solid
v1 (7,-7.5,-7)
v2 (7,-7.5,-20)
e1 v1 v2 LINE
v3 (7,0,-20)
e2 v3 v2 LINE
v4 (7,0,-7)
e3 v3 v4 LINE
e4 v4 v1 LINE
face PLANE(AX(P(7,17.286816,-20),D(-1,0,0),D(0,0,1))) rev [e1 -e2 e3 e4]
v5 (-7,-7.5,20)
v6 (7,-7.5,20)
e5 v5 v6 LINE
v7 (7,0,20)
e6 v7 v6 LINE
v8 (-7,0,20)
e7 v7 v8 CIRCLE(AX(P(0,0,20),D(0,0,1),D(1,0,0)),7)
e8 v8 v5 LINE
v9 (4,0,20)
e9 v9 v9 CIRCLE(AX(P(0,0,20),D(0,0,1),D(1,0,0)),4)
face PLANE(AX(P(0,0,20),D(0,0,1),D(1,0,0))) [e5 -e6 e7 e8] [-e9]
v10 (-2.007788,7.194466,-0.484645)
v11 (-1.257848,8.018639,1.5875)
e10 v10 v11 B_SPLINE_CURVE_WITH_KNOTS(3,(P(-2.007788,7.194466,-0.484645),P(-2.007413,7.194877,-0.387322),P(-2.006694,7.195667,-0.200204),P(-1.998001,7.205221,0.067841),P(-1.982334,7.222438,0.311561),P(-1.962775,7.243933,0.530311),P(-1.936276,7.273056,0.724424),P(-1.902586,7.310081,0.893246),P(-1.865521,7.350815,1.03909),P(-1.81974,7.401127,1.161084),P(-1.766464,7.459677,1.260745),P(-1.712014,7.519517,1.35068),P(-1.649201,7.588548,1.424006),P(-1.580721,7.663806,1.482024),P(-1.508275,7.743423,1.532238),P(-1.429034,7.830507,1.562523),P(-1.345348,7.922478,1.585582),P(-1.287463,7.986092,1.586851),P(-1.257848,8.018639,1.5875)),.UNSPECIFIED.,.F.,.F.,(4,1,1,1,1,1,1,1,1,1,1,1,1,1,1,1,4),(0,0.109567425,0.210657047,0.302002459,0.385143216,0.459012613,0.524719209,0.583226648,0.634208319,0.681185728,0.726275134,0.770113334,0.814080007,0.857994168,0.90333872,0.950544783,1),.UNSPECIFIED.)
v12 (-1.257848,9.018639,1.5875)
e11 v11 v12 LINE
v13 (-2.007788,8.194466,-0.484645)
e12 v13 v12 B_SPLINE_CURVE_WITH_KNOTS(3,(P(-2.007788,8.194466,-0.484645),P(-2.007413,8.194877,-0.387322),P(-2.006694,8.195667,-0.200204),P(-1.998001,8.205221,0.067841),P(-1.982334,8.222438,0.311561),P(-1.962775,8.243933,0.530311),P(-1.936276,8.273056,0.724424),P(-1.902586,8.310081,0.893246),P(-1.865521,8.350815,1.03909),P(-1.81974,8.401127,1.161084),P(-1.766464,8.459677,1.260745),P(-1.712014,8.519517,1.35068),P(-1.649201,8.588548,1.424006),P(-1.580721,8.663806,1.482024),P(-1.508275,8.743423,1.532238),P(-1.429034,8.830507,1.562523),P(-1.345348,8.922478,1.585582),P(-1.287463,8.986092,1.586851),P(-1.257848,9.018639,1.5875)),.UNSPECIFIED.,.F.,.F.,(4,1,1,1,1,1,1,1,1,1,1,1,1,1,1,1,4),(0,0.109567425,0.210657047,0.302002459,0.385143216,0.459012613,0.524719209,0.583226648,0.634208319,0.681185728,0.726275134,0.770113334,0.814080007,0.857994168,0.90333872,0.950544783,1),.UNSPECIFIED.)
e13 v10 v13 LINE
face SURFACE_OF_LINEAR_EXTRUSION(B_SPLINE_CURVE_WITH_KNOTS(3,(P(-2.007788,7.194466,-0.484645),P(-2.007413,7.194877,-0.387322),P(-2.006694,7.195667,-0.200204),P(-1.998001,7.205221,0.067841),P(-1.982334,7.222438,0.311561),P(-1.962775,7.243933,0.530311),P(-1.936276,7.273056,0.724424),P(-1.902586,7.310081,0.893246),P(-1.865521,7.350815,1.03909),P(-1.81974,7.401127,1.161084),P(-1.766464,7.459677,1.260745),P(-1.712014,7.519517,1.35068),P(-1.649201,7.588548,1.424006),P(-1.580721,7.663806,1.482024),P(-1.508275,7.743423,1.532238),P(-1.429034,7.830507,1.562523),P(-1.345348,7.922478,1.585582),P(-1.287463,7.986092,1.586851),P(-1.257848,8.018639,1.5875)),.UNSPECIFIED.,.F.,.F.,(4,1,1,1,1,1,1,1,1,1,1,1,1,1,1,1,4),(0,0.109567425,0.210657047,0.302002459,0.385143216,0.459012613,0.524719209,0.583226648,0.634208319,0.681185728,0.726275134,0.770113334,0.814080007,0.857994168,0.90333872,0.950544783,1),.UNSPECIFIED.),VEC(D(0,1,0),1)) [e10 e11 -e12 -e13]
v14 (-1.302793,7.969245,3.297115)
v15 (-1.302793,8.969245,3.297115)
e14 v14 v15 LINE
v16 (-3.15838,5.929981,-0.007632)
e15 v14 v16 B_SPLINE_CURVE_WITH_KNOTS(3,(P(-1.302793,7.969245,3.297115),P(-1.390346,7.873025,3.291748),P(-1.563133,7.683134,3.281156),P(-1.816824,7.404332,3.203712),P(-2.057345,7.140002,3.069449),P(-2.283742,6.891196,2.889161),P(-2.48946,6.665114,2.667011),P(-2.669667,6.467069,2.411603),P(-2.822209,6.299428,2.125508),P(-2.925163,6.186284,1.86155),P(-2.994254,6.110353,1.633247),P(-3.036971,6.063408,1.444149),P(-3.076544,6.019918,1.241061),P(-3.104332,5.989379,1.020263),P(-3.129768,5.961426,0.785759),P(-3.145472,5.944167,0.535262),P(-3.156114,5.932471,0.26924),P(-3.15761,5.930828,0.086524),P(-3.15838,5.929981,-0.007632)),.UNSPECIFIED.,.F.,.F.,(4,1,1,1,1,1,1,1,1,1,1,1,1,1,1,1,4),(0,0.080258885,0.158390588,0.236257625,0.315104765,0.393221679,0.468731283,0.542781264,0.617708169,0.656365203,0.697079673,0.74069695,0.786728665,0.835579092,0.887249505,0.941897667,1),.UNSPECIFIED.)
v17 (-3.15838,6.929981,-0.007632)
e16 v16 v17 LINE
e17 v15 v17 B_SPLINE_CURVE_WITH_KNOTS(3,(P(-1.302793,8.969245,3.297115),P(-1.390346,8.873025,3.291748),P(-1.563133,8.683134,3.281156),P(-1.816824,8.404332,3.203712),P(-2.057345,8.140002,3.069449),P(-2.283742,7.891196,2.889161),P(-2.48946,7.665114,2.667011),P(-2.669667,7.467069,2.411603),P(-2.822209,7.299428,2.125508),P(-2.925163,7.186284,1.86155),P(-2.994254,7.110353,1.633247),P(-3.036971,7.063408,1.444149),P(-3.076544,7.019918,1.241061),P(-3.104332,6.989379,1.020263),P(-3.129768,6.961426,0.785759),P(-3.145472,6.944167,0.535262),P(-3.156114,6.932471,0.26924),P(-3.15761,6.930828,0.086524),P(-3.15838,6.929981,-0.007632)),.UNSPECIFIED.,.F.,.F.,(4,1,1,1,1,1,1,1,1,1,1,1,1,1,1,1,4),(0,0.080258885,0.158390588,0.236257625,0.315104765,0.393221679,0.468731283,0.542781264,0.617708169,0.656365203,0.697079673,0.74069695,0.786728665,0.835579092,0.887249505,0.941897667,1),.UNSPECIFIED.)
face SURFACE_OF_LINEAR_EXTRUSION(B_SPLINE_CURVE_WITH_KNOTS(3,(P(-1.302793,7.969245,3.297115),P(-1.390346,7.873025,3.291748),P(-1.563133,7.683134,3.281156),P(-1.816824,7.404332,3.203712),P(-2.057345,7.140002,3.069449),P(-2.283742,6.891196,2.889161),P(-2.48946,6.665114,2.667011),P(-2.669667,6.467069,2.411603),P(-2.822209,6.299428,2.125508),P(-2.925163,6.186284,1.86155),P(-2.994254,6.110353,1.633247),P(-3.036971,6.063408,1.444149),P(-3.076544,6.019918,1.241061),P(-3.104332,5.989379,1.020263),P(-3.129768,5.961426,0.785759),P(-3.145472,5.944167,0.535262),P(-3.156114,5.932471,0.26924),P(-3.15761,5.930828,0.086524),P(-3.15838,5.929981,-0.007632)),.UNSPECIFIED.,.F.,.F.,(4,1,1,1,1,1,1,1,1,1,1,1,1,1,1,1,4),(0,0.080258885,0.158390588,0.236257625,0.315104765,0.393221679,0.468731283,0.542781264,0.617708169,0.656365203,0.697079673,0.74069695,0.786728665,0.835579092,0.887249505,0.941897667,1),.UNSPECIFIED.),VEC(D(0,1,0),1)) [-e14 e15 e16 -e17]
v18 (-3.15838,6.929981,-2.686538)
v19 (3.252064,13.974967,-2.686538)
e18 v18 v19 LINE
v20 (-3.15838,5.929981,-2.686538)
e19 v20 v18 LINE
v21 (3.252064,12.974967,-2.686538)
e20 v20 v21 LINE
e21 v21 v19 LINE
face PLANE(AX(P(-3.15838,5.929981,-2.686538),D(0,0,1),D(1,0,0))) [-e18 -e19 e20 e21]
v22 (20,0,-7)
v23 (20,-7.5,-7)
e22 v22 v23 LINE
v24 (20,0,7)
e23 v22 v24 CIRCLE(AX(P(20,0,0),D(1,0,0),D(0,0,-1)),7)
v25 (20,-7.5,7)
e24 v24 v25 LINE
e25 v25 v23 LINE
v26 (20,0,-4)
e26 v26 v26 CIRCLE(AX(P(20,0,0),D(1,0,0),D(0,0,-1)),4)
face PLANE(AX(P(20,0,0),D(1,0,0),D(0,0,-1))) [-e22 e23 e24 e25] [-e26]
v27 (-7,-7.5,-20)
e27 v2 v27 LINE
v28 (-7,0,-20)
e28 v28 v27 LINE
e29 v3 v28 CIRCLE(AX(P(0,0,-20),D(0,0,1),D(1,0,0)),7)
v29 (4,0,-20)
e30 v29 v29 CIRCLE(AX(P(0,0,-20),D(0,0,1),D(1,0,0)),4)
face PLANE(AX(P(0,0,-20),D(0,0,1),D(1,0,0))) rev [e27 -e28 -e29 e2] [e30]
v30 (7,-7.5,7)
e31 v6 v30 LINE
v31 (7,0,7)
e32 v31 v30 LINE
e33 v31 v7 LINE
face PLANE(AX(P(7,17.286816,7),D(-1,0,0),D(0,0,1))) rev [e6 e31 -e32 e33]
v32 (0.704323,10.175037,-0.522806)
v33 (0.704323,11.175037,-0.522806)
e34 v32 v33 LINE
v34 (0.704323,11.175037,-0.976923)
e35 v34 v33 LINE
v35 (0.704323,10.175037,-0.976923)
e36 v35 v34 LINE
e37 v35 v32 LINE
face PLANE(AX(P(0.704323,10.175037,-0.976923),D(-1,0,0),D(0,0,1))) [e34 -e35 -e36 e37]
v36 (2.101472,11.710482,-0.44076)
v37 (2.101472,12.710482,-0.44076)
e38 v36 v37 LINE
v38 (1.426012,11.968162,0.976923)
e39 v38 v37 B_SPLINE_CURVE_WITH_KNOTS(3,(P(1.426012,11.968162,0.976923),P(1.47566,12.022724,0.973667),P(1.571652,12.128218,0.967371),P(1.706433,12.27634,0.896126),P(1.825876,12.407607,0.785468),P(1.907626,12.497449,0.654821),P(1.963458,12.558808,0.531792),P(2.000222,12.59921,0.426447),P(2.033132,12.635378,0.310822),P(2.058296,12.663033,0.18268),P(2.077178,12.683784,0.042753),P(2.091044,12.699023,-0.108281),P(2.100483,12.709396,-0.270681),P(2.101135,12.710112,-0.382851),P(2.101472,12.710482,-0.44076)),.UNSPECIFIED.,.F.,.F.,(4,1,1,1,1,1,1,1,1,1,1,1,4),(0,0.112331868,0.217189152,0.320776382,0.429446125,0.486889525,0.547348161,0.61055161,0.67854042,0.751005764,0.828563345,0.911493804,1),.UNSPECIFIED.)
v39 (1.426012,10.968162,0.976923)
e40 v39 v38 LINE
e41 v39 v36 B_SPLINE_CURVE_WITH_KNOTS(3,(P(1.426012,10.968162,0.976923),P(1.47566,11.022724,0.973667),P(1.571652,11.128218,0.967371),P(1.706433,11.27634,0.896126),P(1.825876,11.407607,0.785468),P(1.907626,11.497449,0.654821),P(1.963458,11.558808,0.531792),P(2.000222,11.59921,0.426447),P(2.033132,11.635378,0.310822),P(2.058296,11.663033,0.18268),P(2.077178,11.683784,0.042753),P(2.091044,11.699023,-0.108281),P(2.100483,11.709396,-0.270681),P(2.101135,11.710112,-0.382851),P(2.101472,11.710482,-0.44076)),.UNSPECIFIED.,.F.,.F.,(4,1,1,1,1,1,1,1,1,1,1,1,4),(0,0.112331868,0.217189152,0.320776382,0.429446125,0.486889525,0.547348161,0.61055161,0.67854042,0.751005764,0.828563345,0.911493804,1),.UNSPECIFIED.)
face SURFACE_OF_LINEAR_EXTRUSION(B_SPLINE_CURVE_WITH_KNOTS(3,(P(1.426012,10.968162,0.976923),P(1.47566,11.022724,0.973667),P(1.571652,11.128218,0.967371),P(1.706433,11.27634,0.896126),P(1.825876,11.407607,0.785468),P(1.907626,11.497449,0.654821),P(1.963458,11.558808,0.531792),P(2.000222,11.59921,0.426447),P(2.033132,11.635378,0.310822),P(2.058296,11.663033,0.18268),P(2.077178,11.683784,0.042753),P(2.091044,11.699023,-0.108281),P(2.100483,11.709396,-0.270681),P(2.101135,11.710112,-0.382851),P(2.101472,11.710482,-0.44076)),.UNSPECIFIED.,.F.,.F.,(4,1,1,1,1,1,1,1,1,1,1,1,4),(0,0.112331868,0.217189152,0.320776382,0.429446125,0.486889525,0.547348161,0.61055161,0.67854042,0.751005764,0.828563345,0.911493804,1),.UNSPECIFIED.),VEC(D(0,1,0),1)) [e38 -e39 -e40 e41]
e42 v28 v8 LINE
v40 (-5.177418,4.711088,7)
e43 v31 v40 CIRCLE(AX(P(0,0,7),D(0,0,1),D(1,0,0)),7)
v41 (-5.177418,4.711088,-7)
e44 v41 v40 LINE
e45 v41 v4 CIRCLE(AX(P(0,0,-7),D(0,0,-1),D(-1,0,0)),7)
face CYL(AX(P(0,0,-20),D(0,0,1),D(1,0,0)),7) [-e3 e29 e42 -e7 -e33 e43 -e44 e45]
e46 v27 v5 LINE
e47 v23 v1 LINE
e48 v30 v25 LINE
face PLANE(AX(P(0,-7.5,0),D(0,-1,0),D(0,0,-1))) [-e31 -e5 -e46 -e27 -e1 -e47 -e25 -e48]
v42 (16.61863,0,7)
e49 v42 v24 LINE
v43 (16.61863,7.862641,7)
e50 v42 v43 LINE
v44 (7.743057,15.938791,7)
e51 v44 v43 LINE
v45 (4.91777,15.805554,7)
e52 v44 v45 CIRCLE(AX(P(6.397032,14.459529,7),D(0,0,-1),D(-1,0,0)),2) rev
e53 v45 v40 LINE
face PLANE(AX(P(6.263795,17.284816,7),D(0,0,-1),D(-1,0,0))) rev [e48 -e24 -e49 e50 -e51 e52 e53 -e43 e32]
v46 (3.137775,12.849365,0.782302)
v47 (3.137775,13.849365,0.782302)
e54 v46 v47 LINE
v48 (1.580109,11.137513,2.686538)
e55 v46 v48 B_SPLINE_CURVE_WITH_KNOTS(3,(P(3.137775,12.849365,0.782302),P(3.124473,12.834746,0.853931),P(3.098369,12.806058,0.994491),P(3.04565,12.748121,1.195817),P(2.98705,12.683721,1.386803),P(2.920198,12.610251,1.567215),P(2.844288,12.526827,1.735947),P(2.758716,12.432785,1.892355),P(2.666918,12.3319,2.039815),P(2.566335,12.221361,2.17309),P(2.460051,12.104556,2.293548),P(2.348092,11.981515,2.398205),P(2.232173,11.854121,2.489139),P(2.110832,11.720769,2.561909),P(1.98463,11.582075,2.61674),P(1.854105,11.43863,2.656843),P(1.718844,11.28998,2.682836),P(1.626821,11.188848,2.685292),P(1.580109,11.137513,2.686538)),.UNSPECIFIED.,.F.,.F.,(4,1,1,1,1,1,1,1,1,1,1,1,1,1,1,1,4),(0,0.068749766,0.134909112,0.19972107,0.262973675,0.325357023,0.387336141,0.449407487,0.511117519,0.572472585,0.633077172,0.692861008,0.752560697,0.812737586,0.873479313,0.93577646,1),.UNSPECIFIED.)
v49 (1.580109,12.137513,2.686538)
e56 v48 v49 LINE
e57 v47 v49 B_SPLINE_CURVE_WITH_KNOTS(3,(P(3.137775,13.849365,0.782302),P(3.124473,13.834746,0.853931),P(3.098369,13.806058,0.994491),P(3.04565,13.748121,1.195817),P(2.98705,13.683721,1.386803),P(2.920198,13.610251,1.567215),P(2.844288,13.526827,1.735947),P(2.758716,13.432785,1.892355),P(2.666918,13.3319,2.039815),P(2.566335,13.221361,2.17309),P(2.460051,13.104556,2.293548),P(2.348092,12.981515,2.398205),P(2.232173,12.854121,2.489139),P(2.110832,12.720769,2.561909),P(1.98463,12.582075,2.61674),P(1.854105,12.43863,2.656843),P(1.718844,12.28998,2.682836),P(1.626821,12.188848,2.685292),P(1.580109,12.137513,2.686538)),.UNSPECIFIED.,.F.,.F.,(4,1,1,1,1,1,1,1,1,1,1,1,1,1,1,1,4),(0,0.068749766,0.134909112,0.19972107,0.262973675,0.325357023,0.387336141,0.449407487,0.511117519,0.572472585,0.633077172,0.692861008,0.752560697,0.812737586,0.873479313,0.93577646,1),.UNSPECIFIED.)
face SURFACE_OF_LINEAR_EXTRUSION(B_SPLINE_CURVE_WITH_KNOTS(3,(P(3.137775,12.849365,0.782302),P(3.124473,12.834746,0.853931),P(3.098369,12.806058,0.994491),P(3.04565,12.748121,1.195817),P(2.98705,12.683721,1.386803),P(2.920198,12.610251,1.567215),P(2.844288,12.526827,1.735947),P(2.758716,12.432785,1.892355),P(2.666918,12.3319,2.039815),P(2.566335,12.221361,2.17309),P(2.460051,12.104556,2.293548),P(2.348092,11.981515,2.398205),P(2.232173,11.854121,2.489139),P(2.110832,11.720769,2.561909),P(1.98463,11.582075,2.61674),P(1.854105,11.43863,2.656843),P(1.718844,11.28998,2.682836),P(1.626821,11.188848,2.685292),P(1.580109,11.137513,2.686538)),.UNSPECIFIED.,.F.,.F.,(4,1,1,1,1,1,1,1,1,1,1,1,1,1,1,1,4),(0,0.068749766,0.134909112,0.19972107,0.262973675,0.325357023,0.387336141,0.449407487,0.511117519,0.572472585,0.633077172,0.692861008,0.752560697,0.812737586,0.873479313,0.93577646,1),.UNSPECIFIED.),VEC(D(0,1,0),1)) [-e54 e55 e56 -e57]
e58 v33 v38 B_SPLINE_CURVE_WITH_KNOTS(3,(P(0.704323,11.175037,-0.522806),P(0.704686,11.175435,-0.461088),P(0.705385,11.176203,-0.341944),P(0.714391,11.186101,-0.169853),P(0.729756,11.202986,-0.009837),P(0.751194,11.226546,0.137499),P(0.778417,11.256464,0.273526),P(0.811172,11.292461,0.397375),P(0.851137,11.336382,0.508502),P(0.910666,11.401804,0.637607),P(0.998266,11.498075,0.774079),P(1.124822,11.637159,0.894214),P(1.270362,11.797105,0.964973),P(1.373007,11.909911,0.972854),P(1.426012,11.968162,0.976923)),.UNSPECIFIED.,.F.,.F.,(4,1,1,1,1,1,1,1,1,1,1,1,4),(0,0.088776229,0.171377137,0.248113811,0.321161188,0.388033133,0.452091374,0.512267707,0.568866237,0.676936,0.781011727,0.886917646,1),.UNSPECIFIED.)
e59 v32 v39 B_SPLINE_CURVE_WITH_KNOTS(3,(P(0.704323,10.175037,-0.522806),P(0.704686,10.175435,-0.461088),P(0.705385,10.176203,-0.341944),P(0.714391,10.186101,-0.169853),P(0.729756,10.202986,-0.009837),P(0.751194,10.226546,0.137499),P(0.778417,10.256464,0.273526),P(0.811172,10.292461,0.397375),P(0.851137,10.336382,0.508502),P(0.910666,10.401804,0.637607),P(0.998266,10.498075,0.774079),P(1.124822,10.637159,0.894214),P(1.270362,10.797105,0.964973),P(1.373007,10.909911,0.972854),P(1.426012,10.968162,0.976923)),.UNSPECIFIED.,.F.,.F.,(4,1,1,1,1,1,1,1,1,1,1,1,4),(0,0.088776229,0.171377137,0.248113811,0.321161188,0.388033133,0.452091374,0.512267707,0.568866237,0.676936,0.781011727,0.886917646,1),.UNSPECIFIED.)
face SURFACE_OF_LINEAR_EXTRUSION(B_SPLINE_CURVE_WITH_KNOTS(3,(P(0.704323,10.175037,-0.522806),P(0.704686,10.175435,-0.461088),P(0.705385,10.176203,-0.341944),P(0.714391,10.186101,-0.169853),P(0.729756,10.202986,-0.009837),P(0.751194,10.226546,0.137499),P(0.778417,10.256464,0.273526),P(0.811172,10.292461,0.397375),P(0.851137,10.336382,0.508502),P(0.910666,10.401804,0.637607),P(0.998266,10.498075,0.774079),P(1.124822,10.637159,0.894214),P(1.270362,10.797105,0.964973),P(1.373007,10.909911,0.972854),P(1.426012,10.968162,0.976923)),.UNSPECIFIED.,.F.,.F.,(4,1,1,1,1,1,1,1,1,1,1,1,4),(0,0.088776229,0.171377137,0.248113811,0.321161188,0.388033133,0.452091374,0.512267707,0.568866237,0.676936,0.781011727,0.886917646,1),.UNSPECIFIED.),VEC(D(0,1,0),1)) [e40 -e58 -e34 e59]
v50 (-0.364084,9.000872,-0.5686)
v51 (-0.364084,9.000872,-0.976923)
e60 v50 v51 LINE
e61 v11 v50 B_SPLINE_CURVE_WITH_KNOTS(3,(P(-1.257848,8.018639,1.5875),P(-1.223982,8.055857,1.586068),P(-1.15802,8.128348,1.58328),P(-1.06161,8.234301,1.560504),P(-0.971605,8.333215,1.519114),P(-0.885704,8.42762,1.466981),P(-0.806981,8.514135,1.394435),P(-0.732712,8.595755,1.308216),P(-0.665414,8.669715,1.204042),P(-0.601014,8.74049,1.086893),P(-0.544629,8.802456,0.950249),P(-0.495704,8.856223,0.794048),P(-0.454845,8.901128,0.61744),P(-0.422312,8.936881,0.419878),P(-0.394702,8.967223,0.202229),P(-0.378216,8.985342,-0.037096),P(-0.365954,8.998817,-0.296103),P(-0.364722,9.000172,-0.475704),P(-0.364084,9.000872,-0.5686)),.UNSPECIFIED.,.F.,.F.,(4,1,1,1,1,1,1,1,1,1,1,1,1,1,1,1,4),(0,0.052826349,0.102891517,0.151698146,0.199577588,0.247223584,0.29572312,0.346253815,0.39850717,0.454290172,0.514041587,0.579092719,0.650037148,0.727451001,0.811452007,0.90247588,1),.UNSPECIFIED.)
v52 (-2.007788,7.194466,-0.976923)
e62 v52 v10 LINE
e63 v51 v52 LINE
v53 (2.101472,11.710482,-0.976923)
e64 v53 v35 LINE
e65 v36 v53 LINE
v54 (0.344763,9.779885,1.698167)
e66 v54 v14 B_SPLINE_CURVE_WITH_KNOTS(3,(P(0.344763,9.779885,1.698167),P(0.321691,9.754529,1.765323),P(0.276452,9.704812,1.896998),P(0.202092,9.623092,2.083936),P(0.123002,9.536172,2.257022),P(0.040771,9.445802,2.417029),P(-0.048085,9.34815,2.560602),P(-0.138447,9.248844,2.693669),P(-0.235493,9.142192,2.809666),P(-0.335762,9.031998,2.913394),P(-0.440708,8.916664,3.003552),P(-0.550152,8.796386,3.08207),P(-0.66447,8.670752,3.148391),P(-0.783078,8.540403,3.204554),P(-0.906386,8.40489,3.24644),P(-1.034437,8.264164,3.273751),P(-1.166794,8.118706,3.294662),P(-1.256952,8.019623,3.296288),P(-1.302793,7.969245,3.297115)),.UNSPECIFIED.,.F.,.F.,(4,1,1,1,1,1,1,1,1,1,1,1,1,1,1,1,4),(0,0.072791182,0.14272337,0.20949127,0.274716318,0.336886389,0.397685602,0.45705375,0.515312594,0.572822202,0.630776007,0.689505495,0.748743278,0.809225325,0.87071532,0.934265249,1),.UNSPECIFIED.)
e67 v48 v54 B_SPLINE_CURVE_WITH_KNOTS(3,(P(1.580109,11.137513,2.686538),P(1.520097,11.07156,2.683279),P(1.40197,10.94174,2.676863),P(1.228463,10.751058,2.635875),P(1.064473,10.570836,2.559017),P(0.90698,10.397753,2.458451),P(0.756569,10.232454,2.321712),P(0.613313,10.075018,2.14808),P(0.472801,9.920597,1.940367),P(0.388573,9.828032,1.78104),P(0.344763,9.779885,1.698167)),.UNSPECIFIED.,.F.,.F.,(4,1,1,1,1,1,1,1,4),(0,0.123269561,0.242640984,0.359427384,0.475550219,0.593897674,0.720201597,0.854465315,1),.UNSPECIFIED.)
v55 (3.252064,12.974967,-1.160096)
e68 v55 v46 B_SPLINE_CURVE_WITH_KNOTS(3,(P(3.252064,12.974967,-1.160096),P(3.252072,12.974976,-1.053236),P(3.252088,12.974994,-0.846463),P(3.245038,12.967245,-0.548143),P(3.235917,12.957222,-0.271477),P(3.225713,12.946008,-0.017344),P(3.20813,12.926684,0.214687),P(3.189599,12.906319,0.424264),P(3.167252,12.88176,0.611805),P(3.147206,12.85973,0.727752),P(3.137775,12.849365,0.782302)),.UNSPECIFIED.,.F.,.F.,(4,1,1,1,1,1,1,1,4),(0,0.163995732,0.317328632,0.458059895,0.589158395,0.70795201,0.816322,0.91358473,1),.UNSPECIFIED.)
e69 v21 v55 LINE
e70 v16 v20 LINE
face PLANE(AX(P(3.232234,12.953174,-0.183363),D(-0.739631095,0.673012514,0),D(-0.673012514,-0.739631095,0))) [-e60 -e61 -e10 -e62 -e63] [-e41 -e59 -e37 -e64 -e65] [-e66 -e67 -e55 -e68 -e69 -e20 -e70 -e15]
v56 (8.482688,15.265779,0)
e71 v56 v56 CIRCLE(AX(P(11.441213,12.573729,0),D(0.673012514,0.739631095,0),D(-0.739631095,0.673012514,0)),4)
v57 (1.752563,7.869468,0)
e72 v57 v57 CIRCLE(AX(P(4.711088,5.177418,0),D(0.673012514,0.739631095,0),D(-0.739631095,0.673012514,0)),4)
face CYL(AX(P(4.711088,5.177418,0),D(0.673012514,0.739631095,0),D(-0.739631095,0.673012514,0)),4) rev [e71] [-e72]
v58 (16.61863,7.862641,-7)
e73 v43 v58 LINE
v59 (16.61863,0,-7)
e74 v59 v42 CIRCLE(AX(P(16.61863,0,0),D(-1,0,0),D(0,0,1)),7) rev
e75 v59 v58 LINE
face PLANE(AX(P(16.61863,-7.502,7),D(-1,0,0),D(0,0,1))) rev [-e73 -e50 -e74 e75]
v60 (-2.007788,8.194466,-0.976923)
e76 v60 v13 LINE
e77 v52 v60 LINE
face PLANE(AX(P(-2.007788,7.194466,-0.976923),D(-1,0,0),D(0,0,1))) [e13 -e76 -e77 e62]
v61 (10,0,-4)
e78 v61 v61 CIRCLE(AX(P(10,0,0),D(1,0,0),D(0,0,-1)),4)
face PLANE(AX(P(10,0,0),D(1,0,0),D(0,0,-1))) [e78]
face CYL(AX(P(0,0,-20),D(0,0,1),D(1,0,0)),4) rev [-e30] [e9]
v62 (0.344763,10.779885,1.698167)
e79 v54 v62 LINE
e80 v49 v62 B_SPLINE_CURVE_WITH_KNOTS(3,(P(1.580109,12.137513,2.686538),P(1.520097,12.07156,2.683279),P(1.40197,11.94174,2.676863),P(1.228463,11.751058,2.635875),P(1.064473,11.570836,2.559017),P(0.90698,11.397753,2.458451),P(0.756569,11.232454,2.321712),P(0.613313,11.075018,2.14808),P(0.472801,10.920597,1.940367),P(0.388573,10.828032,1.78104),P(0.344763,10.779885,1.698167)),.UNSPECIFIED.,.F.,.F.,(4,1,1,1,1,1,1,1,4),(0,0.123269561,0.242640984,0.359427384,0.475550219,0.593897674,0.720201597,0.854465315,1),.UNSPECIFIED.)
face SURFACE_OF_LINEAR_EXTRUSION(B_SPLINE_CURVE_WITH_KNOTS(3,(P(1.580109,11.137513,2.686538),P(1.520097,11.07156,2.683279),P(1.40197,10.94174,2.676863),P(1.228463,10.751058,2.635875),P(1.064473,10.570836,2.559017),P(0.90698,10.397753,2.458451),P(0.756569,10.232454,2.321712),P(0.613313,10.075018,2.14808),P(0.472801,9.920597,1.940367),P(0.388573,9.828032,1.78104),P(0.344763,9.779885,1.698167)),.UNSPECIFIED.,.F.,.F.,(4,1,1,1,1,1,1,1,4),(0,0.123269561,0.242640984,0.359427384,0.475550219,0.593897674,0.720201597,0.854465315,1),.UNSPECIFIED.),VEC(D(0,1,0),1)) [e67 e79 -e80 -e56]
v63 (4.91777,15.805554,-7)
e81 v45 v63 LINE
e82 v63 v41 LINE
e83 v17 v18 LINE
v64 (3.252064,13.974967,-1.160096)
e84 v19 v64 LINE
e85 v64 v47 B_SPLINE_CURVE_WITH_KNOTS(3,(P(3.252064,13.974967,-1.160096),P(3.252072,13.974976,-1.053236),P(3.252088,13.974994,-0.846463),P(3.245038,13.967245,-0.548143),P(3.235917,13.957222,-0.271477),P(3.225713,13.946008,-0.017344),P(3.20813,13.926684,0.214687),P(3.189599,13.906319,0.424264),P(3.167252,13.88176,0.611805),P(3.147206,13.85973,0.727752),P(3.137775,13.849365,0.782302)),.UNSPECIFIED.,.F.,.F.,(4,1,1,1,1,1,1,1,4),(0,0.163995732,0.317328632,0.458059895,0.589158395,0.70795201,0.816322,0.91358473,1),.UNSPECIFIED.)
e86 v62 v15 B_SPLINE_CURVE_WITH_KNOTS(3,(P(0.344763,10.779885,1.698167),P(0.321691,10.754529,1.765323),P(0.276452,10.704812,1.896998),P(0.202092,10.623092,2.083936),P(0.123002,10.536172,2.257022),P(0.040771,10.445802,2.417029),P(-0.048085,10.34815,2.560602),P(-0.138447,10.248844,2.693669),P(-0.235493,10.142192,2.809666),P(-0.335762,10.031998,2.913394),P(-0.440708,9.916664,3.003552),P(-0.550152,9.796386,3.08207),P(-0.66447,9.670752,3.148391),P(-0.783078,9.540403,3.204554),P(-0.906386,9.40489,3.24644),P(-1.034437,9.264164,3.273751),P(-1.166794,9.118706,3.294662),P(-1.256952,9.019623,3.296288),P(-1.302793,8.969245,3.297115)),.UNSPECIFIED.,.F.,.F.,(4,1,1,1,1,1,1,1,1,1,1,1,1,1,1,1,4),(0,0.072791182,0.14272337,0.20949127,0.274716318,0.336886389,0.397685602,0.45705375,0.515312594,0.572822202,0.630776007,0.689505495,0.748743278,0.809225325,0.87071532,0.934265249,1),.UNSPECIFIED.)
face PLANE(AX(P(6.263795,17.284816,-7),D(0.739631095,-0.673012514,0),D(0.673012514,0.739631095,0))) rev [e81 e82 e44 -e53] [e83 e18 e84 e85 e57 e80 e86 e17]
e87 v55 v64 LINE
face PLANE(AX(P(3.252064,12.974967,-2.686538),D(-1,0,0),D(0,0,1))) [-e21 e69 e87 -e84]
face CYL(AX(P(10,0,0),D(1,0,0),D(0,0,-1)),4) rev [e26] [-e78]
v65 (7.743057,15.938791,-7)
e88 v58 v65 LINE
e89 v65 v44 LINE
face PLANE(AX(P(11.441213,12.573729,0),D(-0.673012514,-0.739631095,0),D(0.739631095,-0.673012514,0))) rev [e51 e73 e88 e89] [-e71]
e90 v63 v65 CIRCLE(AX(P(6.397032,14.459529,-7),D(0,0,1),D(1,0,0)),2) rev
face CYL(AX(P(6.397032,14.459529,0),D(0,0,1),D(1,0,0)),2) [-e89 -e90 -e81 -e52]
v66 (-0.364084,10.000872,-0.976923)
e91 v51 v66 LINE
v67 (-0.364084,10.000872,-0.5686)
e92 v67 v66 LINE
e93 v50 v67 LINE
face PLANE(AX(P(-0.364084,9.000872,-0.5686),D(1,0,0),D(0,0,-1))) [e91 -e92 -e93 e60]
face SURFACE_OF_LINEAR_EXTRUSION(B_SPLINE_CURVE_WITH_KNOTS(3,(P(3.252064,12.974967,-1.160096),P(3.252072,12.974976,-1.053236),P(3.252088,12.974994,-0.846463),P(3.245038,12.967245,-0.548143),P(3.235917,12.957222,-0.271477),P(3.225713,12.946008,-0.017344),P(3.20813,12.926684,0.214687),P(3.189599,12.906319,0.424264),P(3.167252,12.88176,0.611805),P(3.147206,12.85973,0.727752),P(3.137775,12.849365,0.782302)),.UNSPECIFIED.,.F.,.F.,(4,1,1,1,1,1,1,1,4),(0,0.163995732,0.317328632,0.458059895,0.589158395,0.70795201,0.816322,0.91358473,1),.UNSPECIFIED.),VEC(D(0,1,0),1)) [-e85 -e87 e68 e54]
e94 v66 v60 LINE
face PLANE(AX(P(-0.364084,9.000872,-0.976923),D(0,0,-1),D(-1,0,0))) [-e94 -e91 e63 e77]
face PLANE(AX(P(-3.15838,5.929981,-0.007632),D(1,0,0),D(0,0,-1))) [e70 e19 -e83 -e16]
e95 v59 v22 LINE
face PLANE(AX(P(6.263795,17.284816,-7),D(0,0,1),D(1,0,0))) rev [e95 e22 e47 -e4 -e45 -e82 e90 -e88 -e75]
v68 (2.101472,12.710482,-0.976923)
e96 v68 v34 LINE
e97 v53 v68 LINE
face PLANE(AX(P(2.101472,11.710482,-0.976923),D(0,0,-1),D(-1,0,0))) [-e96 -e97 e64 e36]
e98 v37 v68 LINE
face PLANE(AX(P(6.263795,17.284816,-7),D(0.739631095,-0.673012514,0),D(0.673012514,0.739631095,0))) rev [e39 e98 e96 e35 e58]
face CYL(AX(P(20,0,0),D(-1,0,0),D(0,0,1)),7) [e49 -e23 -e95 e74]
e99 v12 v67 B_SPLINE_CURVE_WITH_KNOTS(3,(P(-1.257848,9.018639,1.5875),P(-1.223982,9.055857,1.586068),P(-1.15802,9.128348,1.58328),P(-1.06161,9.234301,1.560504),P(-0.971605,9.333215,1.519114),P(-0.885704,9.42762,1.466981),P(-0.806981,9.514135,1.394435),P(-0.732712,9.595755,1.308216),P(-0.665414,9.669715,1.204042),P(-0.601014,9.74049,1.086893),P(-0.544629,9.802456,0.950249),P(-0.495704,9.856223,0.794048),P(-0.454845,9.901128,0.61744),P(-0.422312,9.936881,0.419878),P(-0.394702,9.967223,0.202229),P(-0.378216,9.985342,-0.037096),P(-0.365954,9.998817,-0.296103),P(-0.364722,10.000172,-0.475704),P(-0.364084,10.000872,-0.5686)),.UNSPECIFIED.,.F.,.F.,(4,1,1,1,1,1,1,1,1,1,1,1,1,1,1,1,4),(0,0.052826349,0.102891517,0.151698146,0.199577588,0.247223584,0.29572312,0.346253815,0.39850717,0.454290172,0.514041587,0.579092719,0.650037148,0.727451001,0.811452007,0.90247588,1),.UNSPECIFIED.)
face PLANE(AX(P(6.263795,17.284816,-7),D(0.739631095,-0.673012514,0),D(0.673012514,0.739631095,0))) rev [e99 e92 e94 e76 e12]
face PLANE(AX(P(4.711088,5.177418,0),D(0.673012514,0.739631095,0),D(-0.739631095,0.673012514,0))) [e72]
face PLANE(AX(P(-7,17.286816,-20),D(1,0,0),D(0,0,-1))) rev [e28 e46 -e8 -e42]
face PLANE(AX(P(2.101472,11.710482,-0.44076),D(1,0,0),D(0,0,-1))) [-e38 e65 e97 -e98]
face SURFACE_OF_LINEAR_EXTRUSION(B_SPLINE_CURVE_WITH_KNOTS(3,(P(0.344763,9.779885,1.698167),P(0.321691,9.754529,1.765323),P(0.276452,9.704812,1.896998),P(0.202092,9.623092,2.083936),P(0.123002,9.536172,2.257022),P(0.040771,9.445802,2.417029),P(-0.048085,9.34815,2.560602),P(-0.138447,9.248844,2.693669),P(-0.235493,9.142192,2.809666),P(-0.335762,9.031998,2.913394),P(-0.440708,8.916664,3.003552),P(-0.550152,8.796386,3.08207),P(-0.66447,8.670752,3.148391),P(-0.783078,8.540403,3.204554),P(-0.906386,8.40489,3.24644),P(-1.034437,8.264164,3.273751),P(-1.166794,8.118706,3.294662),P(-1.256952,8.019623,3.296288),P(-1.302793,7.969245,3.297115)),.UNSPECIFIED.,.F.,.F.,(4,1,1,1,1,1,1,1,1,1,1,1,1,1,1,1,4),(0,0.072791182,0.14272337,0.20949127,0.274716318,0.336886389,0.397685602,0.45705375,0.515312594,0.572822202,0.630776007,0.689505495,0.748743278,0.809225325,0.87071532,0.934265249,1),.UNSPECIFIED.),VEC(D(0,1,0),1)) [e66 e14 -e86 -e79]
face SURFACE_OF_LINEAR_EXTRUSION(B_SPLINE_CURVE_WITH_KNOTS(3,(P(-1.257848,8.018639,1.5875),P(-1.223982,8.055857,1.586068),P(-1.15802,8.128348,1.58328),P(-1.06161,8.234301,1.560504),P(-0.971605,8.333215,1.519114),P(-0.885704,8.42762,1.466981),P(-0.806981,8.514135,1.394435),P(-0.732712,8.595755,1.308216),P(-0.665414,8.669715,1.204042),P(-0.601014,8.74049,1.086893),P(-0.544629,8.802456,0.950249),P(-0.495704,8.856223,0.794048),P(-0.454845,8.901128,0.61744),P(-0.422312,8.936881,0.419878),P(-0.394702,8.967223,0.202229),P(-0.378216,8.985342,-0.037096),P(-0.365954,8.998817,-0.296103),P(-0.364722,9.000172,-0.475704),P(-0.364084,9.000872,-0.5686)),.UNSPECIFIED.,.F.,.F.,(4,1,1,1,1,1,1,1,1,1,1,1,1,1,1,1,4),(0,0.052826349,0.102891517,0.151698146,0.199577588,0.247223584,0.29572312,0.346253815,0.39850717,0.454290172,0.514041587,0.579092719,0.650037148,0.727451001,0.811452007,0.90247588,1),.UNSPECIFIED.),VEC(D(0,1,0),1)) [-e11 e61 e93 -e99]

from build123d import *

# Parameters (mm, degrees)
DODANIE_WYCI_GNI_CIE1_DEPTH             = 20
DODANIE_WYCI_GNI_CIE1_DEPTH_BACK        = 20
SZKIC1_R                                = 7
SZKIC1_R_2                              = 4
DODANIE_WYCI_GNI_CIE2_DEPTH             = 10
DODANIE_WYCI_GNI_CIE2_DEPTH_BACK        = 10
SZKIC2_R                                = 4
DODANIE_WYCI_GNI_CIE4_REACH             = 28.181
DODANIE_WYCI_GNI_CIE4_END_RADIUS        = 7
SZKIC3_W                                = 14
SZKIC3_H                                = 14
DODANIE_WYCI_GNI_CIE4_DIRECTION_2_DEPTH = 10
SZKIC9_R                                = 7
DODANIE_WYCI_GNI_CIE6_DEPTH             = 20
DODANIE_WYCI_GNI_CIE5_REACH             = 39.607
SZKIC12_R                               = 4
WYTNIJ_WYCI_GNI_CIE3_DEPTH              = 40.984557912
DODANIE_WYCI_GNI_CIE7_START             = 8
DODANIE_WYCI_GNI_CIE7_DEPTH             = 8.618630395
SZKIC4_R                                = 4
WYTNIJ_WYCI_GNI_CIE1_DEPTH              = 10
SZKIC10_R                               = 4
WYTNIJ_WYCI_GNI_CIE2_DEPTH              = 10
ZAOKR_GLENIE1_R                         = 2
WYTNIJ_WYCI_GNI_CIE4_DEPTH              = 1


with BuildPart() as part:
    # Szkic1 → Dodanie-wyciągnięcie1 (new, two sides: drawn at the far end of the back side and taken through both)
    with BuildSketch(Plane.XY.offset(-DODANIE_WYCI_GNI_CIE1_DEPTH_BACK)):
        Circle(SZKIC1_R)
        Circle(SZKIC1_R_2, mode=Mode.SUBTRACT)
    extrude(amount=DODANIE_WYCI_GNI_CIE1_DEPTH + DODANIE_WYCI_GNI_CIE1_DEPTH_BACK)

    # Szkic2 → Dodanie-wyciągnięcie2 (add, two sides: drawn at the far end of the back side and taken through both)
    with BuildSketch(Plane.XY.offset(-DODANIE_WYCI_GNI_CIE2_DEPTH_BACK)):
        Circle(SZKIC2_R)
    extrude(amount=DODANIE_WYCI_GNI_CIE2_DEPTH + DODANIE_WYCI_GNI_CIE2_DEPTH_BACK)

    # Dodanie-wyciągnięcie4: up to this cylinder (the profile starts outside it)
    dodanie_wyci_gni_cie4_end = Plane(origin=(0, 0, 0), z_dir=(0, 0, 1)) * Cylinder(DODANIE_WYCI_GNI_CIE4_END_RADIUS, 71.362, mode=Mode.PRIVATE)
    # Szkic3 → Dodanie-wyciągnięcie4 (add, up to the surface)
    with BuildSketch(Plane(origin=(4.711087595, 5.177417665, 0), x_dir=(0, 0, 1), z_dir=(0.6730125135097745, 0.7396310949786087, 0)), mode=Mode.PRIVATE) as dodanie_wyci_gni_cie4_sk1:
        Rectangle(SZKIC3_W, SZKIC3_H)
    dodanie_wyci_gni_cie4_tool1 = extrude(dodanie_wyci_gni_cie4_sk1.sketch, amount=-DODANIE_WYCI_GNI_CIE4_REACH, mode=Mode.PRIVATE) - dodanie_wyci_gni_cie4_end
    add(dodanie_wyci_gni_cie4_tool1.solids().sort_by_distance((4.711088, 5.177418, 0))[0])
    add(dodanie_wyci_gni_cie4_tool1.solids().sort_by_distance((4.711088, 5.177418, 0))[1])

    # Szkic3 → Dodanie-wyciągnięcie4 direction 2 (add)
    with BuildSketch(Plane(origin=(4.711087595, 5.177417665, 0), x_dir=(0, 0, 1), z_dir=(0.6730125135097745, 0.7396310949786087, 0))):
        Rectangle(SZKIC3_W, SZKIC3_H)
    extrude(amount=DODANIE_WYCI_GNI_CIE4_DIRECTION_2_DEPTH)

    # Szkic9 → Dodanie-wyciągnięcie6 (add)
    with BuildSketch(Plane(origin=(0, 0, 0), x_dir=(0, 0, -1), z_dir=(1, 0, 0))):
        Circle(SZKIC9_R)
    extrude(amount=DODANIE_WYCI_GNI_CIE6_DEPTH)

    # Szkic8 → Dodanie-wyciągnięcie5 (add, up to next)
    with BuildSketch(Plane(origin=(0, -7.5, 0), x_dir=(1, 0, 0), z_dir=(0, 1, 0)), mode=Mode.PRIVATE) as dodanie_wyci_gni_cie5_sk1:
        Polygon((7, 20), (-7, 20), (-7, -20), (7, -20), (7, -7), (20, -7), (20, 7), (7, 7), align=None)
    dodanie_wyci_gni_cie5_tool1 = extrude(dodanie_wyci_gni_cie5_sk1.sketch, amount=DODANIE_WYCI_GNI_CIE5_REACH, mode=Mode.PRIVATE) - part.part
    add(dodanie_wyci_gni_cie5_tool1.solids().sort_by_distance((3.311321, -7.5, 0))[0])

    # Szkic12 → Wytnij-wyciągnięcie3 (cut, through all)
    with BuildSketch(Plane.XY.offset(10)):
        Circle(SZKIC12_R)
    extrude(amount=-WYTNIJ_WYCI_GNI_CIE3_DEPTH, mode=Mode.SUBTRACT)

    # Dodanie-wyciągnięcie7: read off the stored shape, not the designer's step
    # Dodanie-wyciągnięcie7 outline → Dodanie-wyciągnięcie7 (add)
    with BuildSketch(Plane.YZ.offset(DODANIE_WYCI_GNI_CIE7_START)):
        with BuildLine():
            Line((7.86264102, 7), (0, 7))
            ThreePointArc((0, 7), (7, 0), (0, -7))
            Line((0, -7), (7.86264102, -7))
            Line((7.86264102, -7), (7.86264102, 7))
        make_face()
    extrude(amount=DODANIE_WYCI_GNI_CIE7_DEPTH)

    # Szkic4 → Wytnij-wyciągnięcie1 (cut)
    with BuildSketch(Plane(origin=(11.44121273, 12.573728615, 0), x_dir=(0, 0, -1), z_dir=(0.6730125135097745, 0.7396310949786088, 0))):
        with Locations(Location((0, 0, 0), (0, 0, 90))):
            Circle(SZKIC4_R)
    extrude(amount=-WYTNIJ_WYCI_GNI_CIE1_DEPTH, mode=Mode.SUBTRACT)

    # Szkic10 → Wytnij-wyciągnięcie2 (cut)
    with BuildSketch(Plane(origin=(20, 0, 0), x_dir=(0, 0, -1), z_dir=(1, 0, 0))):
        Circle(SZKIC10_R)
    extrude(amount=-WYTNIJ_WYCI_GNI_CIE2_DEPTH, mode=Mode.SUBTRACT)

    # Zaokrąglenie1
    zaokr_glenie1_edges = [part.edges().sort_by_distance(p)[0] for p in [
        (6.263795065, 17.284816209, 0),
    ]]
    fillet(zaokr_glenie1_edges, radius=ZAOKR_GLENIE1_R)

    # Szkic14 → Wytnij-wyciągnięcie4 (cut, along a direction that is not the sketch's normal)
    with BuildSketch(Plane(origin=(-5.177417665, 4.711087595, 0), x_dir=(0, 0, 1), z_dir=(-0.7396310949786086, 0.6730125135097746, 0))):
        with BuildLine():
            Line((-2.686538462, 3), (-2.686538462, 12.525))
            Line((-2.686538462, 12.525), (-1.160096154, 12.525))
            add(Edge.make_bspline(
                [(-1.160096154, 12.525), (-1.053235648, 12.525012195), (-0.846462595, 12.525035793), (-0.548143042, 12.51455979), (-0.271476851, 12.501007906), (-0.01734448, 12.4858465), (0.214686622, 12.459720367), (0.424263612, 12.432186277), (0.611805228, 12.398981861), (0.727752018, 12.369196471), (0.782301683, 12.355183293)],
                knots=[0, 0, 0, 0, 1.311965854, 2.538629056, 3.664479157, 4.713267157, 5.663616078, 6.530575999, 7.308677837, 8, 8, 8, 8], degree=3))
            add(Edge.make_bspline(
                [(0.782301683, 12.355183293), (0.85393093, 12.335417456), (0.994490509, 12.296630538), (1.195816681, 12.218298682), (1.386802639, 12.131227269), (1.567215194, 12.031895073), (1.735946541, 11.919102874), (1.892355443, 11.79195552), (2.039815254, 11.655556701), (2.173090012, 11.50610502), (2.293548434, 11.348181634), (2.398205206, 11.181827924), (2.489138527, 11.009587547), (2.561909002, 10.829292972), (2.616740188, 10.641774504), (2.656843488, 10.447832876), (2.682835858, 10.24685441), (2.685291796, 10.11012219), (2.686538462, 10.040715144)],
                knots=[0, 0, 0, 0, 1.099996261, 2.158545794, 3.195537121, 4.207578794, 5.205712374, 6.197378256, 7.190519799, 8.17788031, 9.159561366, 10.129234751, 11.085776129, 12.040971148, 13.00380137, 13.975669004, 14.972423361, 16, 16, 16, 16], degree=3))
            add(Edge.make_bspline(
                [(2.686538462, 10.040715144), (2.6832788, 9.951545308), (2.676862558, 9.776025442), (2.635875166, 9.518218515), (2.559017418, 9.274553912), (2.458450925, 9.040540989), (2.321711936, 8.817052614), (2.148079865, 8.604195051), (1.940366984, 8.395414096), (1.781039737, 8.270263996), (1.698167067, 8.205168269)],
                knots=[0, 0, 0, 0, 0.986156485, 1.941127874, 2.875419072, 3.804401753, 4.751181392, 5.761612777, 6.835722519, 8, 8, 8, 8], degree=3))
            add(Edge.make_bspline(
                [(1.698167067, 8.205168269), (1.765323103, 8.170885695), (1.89699751, 8.103667053), (2.083936483, 7.99317967), (2.257021567, 7.875662326), (2.417028822, 7.753479516), (2.560601912, 7.621451735), (2.693669212, 7.487186605), (2.809665872, 7.342991291), (2.913393581, 7.194005189), (3.00355202, 7.038070964), (3.082070078, 6.875451953), (3.148391466, 6.705592614), (3.204554132, 6.529357394), (3.246440263, 6.346140126), (3.273750912, 6.155875284), (3.294661651, 5.959211768), (3.29628831, 5.825249491), (3.297115385, 5.757136418)],
                knots=[0, 0, 0, 0, 1.164658916, 2.283573913, 3.35186032, 4.395461096, 5.390182219, 6.362969632, 7.312859996, 8.245001507, 9.165155236, 10.092416118, 11.032087915, 11.979892451, 12.947605196, 13.931445124, 14.948243989, 16, 16, 16, 16], degree=3))
            add(Edge.make_bspline(
                [(3.297115385, 5.757136418), (3.291748226, 5.627044343), (3.281156159, 5.370308155), (3.203712138, 4.993360467), (3.069448812, 4.63597987), (2.889160851, 4.299586747), (2.667011396, 3.993919126), (2.411603228, 3.726156945), (2.125507722, 3.499502202), (1.861550038, 3.346527834), (1.633247428, 3.243867728), (1.444148642, 3.180396777), (1.241060554, 3.121597384), (1.020263078, 3.080307236), (0.785758971, 3.042513952), (0.535261803, 3.019179595), (0.26923975, 3.003366477), (0.086524304, 3.001144846), (-0.007632212, 3)],
                knots=[0, 0, 0, 0, 1.284142165, 2.534249414, 3.780121997, 5.041676246, 6.291546858, 7.49970053, 8.684500223, 9.883330709, 10.50184324, 11.153274765, 11.851151195, 12.587658647, 13.369265475, 14.195992086, 15.070362669, 16, 16, 16, 16], degree=3))
            Line((-0.007632212, 3), (-2.686538462, 3))
        make_face()
        with BuildLine():
            Line((-0.976923077, 10.815384615), (-0.976923077, 8.739423077))
            Line((-0.976923077, 8.739423077), (-0.52280649, 8.739423077))
            add(Edge.make_bspline(
                [(-0.52280649, 8.739423077), (-0.461087966, 8.739961286), (-0.341944091, 8.741000265), (-0.1698534, 8.754381963), (-0.009836849, 8.77721197), (0.137498653, 8.809065573), (0.273525591, 8.849515004), (0.397374985, 8.898184382), (0.508502292, 8.957566312), (0.63760652, 9.046018318), (0.774079, 9.176179404), (0.894214189, 9.364224061), (0.964973013, 9.580474702), (0.972853637, 9.732991398), (0.976923077, 9.811748798)],
                knots=[0, 0, 0, 0, 1.065314748, 2.056525647, 2.977365736, 3.853934255, 4.656397591, 5.425096493, 6.14721249, 6.826394842, 8.123232004, 9.372140726, 10.643011755, 12, 12, 12, 12], degree=3))
            add(Edge.make_bspline(
                [(0.976923077, 9.811748798), (0.97366678, 9.885518189), (0.967370861, 10.028148341), (0.896125823, 10.228413777), (0.785468194, 10.40588994), (0.654821309, 10.527357859), (0.531791881, 10.610316867), (0.426446534, 10.664941841), (0.310822106, 10.71384156), (0.18268023, 10.751231476), (0.042752669, 10.779287553), (-0.108280873, 10.799891382), (-0.27068098, 10.813915224), (-0.382851079, 10.814884312), (-0.440760216, 10.815384615)],
                knots=[0, 0, 0, 0, 1.347982417, 2.606269829, 3.849316587, 5.153353503, 5.842674298, 6.568177932, 7.326619318, 8.142485038, 9.012069166, 9.942760135, 10.937925643, 12, 12, 12, 12], degree=3))
            Line((-0.440760216, 10.815384615), (-0.976923077, 10.815384615))
        make_face(mode=Mode.SUBTRACT)
        with BuildLine():
            Line((-0.976923077, 7.151923077), (-0.976923077, 4.709615385))
            Line((-0.976923077, 4.709615385), (-0.484645433, 4.709615385))
            add(Edge.make_bspline(
                [(-0.484645433, 4.709615385), (-0.387321516, 4.710171393), (-0.200204141, 4.711240387), (0.067841168, 4.724156384), (0.311561364, 4.747435193), (0.530310682, 4.776496911), (0.724424178, 4.815870993), (0.893245702, 4.865930091), (1.039090422, 4.921003819), (1.161083845, 4.989026413), (1.260745483, 5.068187842), (1.350679663, 5.149092725), (1.424006389, 5.242424151), (1.482023863, 5.344175661), (1.532237884, 5.451819674), (1.562523436, 5.569559649), (1.585581792, 5.693906057), (1.586850755, 5.779913778), (1.5875, 5.823918269)],
                knots=[0, 0, 0, 0, 1.753078804, 3.370512758, 4.83203934, 6.162291463, 7.344201807, 8.395507345, 9.331626367, 10.147333109, 10.898971645, 11.62040215, 12.321813352, 13.025280112, 13.727906689, 14.453419512, 15.208716525, 16, 16, 16, 16], degree=3))
            add(Edge.make_bspline(
                [(1.5875, 5.823918269), (1.586068229, 5.874238098), (1.583279523, 5.972247587), (1.560504132, 6.115498915), (1.519113807, 6.249233534), (1.466980673, 6.37687122), (1.394434648, 6.493842097), (1.308216175, 6.604194086), (1.204042251, 6.704190327), (1.086892595, 6.799878966), (0.95024912, 6.883659553), (0.794047716, 6.956354053), (0.617439814, 7.017065822), (0.41987835, 7.065404572), (0.202229419, 7.106429001), (-0.037095577, 7.130925114), (-0.296103456, 7.14914395), (-0.475703734, 7.150975652), (-0.56859976, 7.151923077)],
                knots=[0, 0, 0, 0, 0.845221588, 1.646264278, 2.427170338, 3.19324141, 3.95557735, 4.731569926, 5.540061037, 6.376114724, 7.268642756, 8.224665384, 9.265483498, 10.400594375, 11.639216012, 12.983232105, 14.439614077, 16, 16, 16, 16], degree=3))
            Line((-0.56859976, 7.151923077), (-0.976923077, 7.151923077))
        make_face(mode=Mode.SUBTRACT)
    extrude(amount=-WYTNIJ_WYCI_GNI_CIE4_DEPTH, dir=(0, 1, 0), mode=Mode.SUBTRACT)


solid = part.part
